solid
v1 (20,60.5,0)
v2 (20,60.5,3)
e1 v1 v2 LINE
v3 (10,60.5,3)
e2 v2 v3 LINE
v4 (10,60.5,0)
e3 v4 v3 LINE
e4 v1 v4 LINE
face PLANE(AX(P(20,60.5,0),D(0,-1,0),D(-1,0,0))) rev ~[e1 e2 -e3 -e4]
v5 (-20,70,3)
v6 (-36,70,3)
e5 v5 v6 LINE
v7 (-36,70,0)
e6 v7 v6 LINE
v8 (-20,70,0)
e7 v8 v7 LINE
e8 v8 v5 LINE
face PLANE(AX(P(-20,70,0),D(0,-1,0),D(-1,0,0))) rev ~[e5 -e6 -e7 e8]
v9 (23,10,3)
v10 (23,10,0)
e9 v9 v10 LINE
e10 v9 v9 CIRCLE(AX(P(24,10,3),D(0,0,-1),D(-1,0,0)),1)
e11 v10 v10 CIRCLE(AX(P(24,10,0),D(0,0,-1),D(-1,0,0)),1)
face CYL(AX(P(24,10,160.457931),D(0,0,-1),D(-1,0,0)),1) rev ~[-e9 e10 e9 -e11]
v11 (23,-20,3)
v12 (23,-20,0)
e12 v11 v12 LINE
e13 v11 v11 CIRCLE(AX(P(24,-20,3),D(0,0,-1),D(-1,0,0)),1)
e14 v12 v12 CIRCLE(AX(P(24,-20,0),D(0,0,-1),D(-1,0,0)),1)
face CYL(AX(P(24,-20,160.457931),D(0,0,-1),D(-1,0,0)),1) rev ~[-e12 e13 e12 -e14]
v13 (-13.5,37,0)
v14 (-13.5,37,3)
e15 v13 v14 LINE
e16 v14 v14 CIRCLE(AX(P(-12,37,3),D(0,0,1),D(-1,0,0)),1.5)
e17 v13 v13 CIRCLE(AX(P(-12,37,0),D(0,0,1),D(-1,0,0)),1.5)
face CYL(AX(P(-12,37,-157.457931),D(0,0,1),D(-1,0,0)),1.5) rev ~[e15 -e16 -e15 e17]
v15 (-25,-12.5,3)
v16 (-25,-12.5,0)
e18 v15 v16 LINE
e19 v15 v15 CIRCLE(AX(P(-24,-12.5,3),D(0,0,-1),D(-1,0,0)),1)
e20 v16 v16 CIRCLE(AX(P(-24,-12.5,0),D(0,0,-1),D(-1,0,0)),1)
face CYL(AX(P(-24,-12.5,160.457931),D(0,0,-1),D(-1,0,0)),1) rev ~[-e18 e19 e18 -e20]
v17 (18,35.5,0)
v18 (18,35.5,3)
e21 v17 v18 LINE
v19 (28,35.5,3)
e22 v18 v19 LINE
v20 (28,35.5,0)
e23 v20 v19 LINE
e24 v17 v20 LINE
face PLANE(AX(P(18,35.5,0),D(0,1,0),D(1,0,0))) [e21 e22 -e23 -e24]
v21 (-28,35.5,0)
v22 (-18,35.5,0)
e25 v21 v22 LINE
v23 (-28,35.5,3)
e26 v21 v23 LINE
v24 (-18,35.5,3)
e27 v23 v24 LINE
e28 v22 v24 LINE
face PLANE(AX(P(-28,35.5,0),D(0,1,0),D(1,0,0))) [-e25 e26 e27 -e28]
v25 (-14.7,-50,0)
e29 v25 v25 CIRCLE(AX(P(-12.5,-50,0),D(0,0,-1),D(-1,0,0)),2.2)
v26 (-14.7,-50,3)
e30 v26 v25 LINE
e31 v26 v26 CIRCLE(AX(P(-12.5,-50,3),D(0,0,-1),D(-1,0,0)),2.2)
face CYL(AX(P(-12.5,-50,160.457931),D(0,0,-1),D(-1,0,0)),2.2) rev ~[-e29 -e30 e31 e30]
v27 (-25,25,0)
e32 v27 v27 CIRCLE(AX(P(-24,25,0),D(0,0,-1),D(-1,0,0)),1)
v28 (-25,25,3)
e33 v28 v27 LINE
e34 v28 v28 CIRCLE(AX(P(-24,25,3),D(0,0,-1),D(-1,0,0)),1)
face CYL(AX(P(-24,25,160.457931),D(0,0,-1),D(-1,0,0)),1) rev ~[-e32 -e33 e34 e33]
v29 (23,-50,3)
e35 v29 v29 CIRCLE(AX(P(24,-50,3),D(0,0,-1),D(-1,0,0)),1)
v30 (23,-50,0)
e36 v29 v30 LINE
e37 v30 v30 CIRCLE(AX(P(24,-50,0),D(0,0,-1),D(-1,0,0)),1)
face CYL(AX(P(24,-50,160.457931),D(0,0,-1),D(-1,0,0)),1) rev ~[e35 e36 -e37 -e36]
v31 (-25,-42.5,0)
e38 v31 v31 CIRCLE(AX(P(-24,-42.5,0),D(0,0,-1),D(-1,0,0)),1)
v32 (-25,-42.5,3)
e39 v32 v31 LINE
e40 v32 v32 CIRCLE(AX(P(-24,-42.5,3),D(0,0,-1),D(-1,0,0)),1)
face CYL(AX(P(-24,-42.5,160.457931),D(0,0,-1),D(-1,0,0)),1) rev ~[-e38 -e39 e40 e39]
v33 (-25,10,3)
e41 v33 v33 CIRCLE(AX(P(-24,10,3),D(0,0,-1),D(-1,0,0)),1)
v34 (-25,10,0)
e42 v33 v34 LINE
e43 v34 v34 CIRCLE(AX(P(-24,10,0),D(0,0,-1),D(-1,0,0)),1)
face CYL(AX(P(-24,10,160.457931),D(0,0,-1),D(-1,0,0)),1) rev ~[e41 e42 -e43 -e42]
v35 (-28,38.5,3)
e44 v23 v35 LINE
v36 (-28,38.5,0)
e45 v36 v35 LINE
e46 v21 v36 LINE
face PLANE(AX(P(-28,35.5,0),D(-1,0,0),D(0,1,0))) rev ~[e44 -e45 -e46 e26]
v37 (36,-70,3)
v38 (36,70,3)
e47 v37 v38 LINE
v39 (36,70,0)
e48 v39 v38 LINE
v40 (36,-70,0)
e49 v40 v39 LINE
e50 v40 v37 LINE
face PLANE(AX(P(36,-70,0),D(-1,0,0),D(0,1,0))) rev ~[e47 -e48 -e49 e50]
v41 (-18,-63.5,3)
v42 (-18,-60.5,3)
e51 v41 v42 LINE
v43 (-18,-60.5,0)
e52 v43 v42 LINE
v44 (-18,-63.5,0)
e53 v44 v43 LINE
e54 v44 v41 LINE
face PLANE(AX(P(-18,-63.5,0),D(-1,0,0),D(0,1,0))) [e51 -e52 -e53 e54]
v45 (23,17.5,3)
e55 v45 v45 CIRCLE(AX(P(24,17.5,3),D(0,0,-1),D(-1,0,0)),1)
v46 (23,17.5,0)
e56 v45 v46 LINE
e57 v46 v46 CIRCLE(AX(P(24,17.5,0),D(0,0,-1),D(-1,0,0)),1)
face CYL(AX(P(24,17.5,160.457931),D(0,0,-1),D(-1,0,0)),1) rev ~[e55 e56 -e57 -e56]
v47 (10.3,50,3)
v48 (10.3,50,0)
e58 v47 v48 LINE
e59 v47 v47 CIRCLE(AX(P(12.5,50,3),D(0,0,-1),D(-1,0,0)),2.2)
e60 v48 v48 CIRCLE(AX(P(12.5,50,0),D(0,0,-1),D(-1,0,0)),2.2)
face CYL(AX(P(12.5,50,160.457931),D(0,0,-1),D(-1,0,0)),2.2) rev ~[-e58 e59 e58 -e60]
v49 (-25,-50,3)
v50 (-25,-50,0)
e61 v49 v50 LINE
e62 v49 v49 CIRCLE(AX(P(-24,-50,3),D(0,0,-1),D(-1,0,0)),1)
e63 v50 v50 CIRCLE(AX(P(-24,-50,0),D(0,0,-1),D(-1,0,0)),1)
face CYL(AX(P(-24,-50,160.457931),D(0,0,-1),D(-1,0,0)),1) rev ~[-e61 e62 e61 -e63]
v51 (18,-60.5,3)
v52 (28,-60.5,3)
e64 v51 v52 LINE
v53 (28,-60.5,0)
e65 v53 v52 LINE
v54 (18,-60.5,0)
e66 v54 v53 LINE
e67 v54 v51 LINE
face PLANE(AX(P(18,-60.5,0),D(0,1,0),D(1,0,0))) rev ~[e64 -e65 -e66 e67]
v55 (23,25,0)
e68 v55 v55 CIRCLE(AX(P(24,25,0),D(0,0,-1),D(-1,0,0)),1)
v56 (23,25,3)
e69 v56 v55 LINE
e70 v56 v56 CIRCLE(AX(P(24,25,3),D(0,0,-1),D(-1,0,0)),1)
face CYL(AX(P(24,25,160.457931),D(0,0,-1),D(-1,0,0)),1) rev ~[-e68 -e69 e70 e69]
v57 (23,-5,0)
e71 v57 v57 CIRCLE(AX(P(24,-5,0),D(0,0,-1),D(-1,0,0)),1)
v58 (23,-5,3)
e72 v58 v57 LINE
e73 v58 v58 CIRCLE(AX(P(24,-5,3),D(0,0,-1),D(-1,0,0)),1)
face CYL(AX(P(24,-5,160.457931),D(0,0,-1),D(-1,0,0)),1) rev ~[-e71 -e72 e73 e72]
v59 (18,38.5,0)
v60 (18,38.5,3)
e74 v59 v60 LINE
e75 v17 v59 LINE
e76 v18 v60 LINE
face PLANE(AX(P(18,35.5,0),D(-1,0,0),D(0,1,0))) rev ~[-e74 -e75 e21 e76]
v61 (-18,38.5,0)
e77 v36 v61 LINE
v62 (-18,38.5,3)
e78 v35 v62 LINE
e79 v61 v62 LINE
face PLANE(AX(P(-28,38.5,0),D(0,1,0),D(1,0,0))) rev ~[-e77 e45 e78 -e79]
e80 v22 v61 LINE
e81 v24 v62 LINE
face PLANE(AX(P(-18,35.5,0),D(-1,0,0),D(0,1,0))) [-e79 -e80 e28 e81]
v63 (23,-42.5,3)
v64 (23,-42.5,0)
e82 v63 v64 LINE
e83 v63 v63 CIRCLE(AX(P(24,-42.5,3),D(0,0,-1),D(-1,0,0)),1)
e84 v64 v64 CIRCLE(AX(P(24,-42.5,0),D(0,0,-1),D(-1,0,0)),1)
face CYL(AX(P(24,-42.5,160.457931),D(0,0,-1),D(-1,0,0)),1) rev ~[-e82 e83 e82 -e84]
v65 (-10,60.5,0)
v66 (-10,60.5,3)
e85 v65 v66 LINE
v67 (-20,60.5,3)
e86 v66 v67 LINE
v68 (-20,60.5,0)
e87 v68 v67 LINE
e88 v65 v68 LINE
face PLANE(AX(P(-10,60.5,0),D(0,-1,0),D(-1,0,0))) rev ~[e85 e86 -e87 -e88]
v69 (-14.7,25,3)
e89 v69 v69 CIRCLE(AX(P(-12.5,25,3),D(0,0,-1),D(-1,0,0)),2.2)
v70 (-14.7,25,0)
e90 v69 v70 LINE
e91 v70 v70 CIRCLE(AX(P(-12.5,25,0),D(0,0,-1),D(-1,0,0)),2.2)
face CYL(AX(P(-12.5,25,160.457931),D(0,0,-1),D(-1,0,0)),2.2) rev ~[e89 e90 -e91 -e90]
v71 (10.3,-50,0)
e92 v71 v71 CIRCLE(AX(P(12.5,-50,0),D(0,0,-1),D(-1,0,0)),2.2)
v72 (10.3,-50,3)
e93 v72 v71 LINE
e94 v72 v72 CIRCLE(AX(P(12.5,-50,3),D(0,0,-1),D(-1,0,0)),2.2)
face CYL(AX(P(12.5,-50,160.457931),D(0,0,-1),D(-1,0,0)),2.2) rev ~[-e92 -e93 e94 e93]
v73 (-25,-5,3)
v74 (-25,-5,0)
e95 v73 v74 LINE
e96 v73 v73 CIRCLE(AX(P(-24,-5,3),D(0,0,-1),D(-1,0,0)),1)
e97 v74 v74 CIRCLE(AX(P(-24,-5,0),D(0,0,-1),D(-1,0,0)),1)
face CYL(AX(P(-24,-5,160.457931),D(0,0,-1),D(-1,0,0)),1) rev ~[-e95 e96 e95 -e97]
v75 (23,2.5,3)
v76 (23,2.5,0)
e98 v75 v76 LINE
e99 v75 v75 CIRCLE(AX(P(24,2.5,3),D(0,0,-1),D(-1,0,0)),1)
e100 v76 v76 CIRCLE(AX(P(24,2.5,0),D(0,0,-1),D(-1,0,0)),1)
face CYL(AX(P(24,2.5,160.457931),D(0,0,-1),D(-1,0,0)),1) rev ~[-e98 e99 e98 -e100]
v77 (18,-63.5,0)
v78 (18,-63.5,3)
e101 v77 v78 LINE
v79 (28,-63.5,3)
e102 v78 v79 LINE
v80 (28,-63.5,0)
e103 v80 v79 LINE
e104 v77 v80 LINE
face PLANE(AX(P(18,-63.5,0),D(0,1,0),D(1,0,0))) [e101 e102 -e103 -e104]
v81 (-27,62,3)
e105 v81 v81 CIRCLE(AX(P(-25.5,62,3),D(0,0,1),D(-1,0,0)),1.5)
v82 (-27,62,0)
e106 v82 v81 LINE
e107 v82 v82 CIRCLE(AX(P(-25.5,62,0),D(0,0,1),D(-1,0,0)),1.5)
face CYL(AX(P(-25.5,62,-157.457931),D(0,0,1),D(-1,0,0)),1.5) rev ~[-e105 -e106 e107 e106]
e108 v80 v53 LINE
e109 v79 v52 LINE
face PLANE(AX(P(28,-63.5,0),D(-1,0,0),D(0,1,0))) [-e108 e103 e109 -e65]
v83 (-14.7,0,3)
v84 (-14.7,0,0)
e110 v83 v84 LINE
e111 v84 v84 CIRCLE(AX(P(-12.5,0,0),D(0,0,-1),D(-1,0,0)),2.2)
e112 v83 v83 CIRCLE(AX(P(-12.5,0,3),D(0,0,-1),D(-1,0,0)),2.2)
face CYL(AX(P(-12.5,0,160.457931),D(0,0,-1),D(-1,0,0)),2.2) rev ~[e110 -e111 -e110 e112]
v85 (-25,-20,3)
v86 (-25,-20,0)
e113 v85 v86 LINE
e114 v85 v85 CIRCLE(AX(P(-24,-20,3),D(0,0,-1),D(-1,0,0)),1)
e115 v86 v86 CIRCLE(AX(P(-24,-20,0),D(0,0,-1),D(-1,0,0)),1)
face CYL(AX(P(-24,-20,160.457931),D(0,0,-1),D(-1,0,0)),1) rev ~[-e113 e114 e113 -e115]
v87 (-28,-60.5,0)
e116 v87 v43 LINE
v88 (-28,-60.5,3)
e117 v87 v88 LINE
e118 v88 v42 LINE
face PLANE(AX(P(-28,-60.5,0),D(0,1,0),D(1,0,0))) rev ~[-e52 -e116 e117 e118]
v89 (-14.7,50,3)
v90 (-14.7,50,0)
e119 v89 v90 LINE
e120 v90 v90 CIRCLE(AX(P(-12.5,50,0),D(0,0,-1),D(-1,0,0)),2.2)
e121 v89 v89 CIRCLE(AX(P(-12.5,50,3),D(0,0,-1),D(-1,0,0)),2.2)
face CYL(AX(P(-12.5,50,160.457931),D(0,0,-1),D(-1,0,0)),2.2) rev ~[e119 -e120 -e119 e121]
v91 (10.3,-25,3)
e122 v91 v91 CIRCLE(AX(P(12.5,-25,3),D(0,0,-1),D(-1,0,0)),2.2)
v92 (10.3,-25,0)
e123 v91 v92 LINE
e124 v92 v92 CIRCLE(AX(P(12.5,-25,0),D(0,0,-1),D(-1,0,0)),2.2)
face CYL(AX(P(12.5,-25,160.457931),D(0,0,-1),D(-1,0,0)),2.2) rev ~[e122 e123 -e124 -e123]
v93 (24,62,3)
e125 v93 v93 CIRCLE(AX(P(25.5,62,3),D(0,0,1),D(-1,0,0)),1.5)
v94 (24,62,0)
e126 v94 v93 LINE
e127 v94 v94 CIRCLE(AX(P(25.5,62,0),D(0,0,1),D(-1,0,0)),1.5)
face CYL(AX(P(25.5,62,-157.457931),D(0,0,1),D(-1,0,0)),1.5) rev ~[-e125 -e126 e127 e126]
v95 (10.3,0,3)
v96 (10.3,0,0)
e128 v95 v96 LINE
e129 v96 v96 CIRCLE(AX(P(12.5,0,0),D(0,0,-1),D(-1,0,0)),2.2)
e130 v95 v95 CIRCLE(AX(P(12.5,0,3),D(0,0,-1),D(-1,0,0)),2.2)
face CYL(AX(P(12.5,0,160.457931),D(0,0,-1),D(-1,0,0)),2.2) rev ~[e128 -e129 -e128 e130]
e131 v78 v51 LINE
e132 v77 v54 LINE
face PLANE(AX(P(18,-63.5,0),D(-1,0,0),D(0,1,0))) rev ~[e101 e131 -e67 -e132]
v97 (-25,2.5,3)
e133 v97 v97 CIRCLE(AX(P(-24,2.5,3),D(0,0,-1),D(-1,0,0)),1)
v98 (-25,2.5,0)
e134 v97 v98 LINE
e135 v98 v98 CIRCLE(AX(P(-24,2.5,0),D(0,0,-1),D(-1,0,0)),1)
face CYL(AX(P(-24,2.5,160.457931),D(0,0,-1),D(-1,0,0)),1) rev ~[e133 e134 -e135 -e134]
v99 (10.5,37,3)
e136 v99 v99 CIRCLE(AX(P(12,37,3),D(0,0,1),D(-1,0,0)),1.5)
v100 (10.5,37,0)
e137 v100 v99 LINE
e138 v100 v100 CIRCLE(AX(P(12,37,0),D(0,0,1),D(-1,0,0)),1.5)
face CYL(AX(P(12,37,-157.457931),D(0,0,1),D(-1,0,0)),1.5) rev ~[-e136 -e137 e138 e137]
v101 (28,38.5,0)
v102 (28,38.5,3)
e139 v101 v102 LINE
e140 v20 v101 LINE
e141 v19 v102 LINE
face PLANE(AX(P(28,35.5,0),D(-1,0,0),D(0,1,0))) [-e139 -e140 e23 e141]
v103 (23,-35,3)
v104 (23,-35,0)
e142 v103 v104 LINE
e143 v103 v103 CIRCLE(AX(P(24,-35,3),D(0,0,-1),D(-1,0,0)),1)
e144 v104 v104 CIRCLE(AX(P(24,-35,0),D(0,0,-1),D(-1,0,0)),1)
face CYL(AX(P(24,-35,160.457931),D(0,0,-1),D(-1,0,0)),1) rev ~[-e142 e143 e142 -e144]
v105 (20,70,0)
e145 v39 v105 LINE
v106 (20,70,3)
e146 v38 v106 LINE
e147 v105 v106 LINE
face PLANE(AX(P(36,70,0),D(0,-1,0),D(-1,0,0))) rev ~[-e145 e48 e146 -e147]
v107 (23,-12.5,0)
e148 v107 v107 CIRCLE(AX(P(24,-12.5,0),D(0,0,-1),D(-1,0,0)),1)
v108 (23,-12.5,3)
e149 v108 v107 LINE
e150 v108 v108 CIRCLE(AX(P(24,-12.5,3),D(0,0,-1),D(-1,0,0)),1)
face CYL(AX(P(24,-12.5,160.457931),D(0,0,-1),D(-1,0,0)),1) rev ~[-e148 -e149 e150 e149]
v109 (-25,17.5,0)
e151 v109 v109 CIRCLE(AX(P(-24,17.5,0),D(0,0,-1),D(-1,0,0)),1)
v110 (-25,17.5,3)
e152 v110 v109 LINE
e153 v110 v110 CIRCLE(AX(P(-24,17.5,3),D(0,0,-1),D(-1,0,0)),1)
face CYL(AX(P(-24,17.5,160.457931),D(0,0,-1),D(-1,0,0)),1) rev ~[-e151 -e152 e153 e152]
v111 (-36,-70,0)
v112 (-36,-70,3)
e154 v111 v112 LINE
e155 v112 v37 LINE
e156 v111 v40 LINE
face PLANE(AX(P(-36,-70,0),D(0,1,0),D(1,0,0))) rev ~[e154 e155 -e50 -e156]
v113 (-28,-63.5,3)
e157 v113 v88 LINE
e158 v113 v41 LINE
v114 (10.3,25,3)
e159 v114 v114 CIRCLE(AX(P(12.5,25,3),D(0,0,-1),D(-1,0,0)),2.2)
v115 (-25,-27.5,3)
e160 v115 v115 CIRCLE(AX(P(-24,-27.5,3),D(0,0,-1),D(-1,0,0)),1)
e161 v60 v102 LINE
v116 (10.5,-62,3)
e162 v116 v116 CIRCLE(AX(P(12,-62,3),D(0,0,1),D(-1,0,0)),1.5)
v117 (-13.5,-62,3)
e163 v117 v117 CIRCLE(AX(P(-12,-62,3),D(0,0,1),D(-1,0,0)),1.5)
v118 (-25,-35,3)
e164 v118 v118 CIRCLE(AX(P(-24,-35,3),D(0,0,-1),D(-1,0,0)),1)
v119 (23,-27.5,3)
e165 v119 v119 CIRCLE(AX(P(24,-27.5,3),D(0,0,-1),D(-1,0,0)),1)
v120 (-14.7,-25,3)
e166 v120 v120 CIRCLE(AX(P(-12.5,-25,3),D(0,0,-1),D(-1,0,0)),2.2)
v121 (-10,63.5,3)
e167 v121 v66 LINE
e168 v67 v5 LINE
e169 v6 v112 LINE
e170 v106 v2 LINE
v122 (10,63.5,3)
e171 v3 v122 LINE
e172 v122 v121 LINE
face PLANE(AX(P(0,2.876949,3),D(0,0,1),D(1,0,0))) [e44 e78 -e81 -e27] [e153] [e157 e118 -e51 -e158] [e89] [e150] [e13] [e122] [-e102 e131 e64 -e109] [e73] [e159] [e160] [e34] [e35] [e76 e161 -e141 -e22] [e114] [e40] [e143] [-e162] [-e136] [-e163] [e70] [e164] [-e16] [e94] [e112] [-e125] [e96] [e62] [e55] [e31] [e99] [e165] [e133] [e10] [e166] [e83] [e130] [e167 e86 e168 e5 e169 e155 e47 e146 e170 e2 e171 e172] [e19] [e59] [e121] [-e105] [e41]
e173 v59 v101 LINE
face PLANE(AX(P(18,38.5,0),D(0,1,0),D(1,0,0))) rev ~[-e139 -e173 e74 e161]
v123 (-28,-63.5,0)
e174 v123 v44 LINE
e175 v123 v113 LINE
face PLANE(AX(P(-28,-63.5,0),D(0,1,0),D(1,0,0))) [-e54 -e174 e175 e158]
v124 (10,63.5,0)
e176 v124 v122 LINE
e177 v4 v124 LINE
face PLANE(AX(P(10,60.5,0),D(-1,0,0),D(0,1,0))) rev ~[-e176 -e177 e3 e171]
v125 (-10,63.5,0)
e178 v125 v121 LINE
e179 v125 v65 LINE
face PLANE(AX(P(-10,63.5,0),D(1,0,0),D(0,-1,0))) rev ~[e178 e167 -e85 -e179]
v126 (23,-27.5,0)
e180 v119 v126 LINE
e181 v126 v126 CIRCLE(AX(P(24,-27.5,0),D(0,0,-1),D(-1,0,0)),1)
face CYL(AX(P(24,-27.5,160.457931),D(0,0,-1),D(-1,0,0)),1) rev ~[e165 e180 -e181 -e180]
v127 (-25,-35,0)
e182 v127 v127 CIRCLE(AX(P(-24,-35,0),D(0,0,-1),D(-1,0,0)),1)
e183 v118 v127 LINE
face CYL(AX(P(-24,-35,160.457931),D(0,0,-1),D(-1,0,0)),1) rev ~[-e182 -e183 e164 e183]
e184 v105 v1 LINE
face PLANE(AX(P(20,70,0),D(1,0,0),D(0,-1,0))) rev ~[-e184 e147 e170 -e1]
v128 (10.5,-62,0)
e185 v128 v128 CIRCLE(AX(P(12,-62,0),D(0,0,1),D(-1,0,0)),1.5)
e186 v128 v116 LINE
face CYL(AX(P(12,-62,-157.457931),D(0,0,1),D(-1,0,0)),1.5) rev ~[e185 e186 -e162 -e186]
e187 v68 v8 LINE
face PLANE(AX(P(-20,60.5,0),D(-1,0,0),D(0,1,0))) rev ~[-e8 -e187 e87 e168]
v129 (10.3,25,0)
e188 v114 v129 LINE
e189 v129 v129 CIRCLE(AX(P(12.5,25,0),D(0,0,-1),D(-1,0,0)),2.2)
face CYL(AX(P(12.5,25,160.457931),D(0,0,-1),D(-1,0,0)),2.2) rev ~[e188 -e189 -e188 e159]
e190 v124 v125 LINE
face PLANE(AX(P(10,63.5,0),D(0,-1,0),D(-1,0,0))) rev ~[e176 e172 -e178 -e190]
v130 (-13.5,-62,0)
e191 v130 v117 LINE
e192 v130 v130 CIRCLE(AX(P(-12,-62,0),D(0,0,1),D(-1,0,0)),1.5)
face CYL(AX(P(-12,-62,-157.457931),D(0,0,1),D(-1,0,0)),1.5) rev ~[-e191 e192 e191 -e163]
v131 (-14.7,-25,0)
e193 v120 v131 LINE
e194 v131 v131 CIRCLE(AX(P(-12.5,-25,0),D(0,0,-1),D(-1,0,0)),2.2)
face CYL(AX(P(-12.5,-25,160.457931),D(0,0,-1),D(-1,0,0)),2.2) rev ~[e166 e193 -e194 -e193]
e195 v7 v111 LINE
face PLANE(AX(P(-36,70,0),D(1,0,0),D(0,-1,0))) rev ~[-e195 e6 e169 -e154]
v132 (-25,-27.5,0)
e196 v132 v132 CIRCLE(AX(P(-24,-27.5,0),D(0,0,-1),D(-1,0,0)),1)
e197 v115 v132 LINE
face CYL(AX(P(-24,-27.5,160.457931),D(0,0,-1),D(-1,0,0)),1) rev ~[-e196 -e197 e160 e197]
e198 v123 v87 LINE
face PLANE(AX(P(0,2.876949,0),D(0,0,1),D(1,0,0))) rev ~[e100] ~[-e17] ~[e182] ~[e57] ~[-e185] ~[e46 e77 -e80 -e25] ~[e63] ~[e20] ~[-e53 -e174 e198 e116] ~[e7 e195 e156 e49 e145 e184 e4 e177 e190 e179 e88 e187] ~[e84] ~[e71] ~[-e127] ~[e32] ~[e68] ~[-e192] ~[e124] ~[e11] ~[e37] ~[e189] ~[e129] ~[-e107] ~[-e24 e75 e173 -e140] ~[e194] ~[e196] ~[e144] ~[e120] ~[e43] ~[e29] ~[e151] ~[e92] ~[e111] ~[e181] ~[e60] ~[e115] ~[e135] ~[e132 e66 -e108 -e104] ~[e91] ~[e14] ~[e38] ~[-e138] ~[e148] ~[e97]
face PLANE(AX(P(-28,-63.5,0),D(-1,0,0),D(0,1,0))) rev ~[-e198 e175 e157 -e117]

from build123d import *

# Parameters (mm, degrees)
F1_W     = 10
F1_H     = 3
F2_DEPTH = 3
F4_D     = 2
F6_D     = 3
F8_D     = 4.4


# Not quite as in the source:
# - a feature names something its author has since deleted; it is built from what else it names


with BuildPart() as f2:
    # F1 (on Top) → F2 (new body)
    with BuildSketch(Plane.XY):
        Polygon((-36, -70), (36, -70), (36, 70), (20, 70), (20, 63.5), (20, 60.5), (10, 60.5), (10, 63.5), (-10, 63.5), (-10, 60.5), (-20, 60.5), (-20, 63.5), (-20, 70), (-36, 70), align=None)
        with Locations((-23, -62)):
            Rectangle(F1_W, F1_H, mode=Mode.SUBTRACT)
        with Locations((23, -62)):
            Rectangle(F1_W, F1_H, mode=Mode.SUBTRACT)
        with Locations((-23, 37)):
            Rectangle(F1_W, F1_H, mode=Mode.SUBTRACT)
        with Locations((23, 37)):
            Rectangle(F1_W, F1_H, mode=Mode.SUBTRACT)
    extrude(amount=F2_DEPTH)

    # F4 (through all)
    with Locations(Plane.XY.offset(3)):
        with Locations((24, -50), (24, -42.5), (24, -35), (-24, -50), (-24, -42.5), (-24, -35), (-24, -27.5), (24, -27.5), (-24, -20), (24, -20), (-24, -12.5), (-24, -5), (-24, 2.5), (-24, 10), (-24, 17.5), (24, -12.5), (24, -5), (24, 2.5), (24, 10), (24, 17.5), (-24, 25), (24, 25)):
            Hole(F4_D / 2)

    # F6 (through all)
    with Locations(Plane(origin=(0, 0, 0), x_dir=(1, 0, 0), z_dir=(0, 0, -1))):
        with Locations((-25.5, -62), (25.5, -62), (-12, 62), (12, 62), (-12, -37), (12, -37)):
            Hole(F6_D / 2)

    # F8 (through all)
    with Locations(Plane.XY.offset(3)):
        with Locations((-12.5, -50), (12.5, -50), (-12.5, -25), (12.5, -25), (-12.5, 0), (12.5, 0), (-12.5, 25), (12.5, 25), (-12.5, 50), (12.5, 50)):
            Hole(F8_D / 2)


solid = f2.part
